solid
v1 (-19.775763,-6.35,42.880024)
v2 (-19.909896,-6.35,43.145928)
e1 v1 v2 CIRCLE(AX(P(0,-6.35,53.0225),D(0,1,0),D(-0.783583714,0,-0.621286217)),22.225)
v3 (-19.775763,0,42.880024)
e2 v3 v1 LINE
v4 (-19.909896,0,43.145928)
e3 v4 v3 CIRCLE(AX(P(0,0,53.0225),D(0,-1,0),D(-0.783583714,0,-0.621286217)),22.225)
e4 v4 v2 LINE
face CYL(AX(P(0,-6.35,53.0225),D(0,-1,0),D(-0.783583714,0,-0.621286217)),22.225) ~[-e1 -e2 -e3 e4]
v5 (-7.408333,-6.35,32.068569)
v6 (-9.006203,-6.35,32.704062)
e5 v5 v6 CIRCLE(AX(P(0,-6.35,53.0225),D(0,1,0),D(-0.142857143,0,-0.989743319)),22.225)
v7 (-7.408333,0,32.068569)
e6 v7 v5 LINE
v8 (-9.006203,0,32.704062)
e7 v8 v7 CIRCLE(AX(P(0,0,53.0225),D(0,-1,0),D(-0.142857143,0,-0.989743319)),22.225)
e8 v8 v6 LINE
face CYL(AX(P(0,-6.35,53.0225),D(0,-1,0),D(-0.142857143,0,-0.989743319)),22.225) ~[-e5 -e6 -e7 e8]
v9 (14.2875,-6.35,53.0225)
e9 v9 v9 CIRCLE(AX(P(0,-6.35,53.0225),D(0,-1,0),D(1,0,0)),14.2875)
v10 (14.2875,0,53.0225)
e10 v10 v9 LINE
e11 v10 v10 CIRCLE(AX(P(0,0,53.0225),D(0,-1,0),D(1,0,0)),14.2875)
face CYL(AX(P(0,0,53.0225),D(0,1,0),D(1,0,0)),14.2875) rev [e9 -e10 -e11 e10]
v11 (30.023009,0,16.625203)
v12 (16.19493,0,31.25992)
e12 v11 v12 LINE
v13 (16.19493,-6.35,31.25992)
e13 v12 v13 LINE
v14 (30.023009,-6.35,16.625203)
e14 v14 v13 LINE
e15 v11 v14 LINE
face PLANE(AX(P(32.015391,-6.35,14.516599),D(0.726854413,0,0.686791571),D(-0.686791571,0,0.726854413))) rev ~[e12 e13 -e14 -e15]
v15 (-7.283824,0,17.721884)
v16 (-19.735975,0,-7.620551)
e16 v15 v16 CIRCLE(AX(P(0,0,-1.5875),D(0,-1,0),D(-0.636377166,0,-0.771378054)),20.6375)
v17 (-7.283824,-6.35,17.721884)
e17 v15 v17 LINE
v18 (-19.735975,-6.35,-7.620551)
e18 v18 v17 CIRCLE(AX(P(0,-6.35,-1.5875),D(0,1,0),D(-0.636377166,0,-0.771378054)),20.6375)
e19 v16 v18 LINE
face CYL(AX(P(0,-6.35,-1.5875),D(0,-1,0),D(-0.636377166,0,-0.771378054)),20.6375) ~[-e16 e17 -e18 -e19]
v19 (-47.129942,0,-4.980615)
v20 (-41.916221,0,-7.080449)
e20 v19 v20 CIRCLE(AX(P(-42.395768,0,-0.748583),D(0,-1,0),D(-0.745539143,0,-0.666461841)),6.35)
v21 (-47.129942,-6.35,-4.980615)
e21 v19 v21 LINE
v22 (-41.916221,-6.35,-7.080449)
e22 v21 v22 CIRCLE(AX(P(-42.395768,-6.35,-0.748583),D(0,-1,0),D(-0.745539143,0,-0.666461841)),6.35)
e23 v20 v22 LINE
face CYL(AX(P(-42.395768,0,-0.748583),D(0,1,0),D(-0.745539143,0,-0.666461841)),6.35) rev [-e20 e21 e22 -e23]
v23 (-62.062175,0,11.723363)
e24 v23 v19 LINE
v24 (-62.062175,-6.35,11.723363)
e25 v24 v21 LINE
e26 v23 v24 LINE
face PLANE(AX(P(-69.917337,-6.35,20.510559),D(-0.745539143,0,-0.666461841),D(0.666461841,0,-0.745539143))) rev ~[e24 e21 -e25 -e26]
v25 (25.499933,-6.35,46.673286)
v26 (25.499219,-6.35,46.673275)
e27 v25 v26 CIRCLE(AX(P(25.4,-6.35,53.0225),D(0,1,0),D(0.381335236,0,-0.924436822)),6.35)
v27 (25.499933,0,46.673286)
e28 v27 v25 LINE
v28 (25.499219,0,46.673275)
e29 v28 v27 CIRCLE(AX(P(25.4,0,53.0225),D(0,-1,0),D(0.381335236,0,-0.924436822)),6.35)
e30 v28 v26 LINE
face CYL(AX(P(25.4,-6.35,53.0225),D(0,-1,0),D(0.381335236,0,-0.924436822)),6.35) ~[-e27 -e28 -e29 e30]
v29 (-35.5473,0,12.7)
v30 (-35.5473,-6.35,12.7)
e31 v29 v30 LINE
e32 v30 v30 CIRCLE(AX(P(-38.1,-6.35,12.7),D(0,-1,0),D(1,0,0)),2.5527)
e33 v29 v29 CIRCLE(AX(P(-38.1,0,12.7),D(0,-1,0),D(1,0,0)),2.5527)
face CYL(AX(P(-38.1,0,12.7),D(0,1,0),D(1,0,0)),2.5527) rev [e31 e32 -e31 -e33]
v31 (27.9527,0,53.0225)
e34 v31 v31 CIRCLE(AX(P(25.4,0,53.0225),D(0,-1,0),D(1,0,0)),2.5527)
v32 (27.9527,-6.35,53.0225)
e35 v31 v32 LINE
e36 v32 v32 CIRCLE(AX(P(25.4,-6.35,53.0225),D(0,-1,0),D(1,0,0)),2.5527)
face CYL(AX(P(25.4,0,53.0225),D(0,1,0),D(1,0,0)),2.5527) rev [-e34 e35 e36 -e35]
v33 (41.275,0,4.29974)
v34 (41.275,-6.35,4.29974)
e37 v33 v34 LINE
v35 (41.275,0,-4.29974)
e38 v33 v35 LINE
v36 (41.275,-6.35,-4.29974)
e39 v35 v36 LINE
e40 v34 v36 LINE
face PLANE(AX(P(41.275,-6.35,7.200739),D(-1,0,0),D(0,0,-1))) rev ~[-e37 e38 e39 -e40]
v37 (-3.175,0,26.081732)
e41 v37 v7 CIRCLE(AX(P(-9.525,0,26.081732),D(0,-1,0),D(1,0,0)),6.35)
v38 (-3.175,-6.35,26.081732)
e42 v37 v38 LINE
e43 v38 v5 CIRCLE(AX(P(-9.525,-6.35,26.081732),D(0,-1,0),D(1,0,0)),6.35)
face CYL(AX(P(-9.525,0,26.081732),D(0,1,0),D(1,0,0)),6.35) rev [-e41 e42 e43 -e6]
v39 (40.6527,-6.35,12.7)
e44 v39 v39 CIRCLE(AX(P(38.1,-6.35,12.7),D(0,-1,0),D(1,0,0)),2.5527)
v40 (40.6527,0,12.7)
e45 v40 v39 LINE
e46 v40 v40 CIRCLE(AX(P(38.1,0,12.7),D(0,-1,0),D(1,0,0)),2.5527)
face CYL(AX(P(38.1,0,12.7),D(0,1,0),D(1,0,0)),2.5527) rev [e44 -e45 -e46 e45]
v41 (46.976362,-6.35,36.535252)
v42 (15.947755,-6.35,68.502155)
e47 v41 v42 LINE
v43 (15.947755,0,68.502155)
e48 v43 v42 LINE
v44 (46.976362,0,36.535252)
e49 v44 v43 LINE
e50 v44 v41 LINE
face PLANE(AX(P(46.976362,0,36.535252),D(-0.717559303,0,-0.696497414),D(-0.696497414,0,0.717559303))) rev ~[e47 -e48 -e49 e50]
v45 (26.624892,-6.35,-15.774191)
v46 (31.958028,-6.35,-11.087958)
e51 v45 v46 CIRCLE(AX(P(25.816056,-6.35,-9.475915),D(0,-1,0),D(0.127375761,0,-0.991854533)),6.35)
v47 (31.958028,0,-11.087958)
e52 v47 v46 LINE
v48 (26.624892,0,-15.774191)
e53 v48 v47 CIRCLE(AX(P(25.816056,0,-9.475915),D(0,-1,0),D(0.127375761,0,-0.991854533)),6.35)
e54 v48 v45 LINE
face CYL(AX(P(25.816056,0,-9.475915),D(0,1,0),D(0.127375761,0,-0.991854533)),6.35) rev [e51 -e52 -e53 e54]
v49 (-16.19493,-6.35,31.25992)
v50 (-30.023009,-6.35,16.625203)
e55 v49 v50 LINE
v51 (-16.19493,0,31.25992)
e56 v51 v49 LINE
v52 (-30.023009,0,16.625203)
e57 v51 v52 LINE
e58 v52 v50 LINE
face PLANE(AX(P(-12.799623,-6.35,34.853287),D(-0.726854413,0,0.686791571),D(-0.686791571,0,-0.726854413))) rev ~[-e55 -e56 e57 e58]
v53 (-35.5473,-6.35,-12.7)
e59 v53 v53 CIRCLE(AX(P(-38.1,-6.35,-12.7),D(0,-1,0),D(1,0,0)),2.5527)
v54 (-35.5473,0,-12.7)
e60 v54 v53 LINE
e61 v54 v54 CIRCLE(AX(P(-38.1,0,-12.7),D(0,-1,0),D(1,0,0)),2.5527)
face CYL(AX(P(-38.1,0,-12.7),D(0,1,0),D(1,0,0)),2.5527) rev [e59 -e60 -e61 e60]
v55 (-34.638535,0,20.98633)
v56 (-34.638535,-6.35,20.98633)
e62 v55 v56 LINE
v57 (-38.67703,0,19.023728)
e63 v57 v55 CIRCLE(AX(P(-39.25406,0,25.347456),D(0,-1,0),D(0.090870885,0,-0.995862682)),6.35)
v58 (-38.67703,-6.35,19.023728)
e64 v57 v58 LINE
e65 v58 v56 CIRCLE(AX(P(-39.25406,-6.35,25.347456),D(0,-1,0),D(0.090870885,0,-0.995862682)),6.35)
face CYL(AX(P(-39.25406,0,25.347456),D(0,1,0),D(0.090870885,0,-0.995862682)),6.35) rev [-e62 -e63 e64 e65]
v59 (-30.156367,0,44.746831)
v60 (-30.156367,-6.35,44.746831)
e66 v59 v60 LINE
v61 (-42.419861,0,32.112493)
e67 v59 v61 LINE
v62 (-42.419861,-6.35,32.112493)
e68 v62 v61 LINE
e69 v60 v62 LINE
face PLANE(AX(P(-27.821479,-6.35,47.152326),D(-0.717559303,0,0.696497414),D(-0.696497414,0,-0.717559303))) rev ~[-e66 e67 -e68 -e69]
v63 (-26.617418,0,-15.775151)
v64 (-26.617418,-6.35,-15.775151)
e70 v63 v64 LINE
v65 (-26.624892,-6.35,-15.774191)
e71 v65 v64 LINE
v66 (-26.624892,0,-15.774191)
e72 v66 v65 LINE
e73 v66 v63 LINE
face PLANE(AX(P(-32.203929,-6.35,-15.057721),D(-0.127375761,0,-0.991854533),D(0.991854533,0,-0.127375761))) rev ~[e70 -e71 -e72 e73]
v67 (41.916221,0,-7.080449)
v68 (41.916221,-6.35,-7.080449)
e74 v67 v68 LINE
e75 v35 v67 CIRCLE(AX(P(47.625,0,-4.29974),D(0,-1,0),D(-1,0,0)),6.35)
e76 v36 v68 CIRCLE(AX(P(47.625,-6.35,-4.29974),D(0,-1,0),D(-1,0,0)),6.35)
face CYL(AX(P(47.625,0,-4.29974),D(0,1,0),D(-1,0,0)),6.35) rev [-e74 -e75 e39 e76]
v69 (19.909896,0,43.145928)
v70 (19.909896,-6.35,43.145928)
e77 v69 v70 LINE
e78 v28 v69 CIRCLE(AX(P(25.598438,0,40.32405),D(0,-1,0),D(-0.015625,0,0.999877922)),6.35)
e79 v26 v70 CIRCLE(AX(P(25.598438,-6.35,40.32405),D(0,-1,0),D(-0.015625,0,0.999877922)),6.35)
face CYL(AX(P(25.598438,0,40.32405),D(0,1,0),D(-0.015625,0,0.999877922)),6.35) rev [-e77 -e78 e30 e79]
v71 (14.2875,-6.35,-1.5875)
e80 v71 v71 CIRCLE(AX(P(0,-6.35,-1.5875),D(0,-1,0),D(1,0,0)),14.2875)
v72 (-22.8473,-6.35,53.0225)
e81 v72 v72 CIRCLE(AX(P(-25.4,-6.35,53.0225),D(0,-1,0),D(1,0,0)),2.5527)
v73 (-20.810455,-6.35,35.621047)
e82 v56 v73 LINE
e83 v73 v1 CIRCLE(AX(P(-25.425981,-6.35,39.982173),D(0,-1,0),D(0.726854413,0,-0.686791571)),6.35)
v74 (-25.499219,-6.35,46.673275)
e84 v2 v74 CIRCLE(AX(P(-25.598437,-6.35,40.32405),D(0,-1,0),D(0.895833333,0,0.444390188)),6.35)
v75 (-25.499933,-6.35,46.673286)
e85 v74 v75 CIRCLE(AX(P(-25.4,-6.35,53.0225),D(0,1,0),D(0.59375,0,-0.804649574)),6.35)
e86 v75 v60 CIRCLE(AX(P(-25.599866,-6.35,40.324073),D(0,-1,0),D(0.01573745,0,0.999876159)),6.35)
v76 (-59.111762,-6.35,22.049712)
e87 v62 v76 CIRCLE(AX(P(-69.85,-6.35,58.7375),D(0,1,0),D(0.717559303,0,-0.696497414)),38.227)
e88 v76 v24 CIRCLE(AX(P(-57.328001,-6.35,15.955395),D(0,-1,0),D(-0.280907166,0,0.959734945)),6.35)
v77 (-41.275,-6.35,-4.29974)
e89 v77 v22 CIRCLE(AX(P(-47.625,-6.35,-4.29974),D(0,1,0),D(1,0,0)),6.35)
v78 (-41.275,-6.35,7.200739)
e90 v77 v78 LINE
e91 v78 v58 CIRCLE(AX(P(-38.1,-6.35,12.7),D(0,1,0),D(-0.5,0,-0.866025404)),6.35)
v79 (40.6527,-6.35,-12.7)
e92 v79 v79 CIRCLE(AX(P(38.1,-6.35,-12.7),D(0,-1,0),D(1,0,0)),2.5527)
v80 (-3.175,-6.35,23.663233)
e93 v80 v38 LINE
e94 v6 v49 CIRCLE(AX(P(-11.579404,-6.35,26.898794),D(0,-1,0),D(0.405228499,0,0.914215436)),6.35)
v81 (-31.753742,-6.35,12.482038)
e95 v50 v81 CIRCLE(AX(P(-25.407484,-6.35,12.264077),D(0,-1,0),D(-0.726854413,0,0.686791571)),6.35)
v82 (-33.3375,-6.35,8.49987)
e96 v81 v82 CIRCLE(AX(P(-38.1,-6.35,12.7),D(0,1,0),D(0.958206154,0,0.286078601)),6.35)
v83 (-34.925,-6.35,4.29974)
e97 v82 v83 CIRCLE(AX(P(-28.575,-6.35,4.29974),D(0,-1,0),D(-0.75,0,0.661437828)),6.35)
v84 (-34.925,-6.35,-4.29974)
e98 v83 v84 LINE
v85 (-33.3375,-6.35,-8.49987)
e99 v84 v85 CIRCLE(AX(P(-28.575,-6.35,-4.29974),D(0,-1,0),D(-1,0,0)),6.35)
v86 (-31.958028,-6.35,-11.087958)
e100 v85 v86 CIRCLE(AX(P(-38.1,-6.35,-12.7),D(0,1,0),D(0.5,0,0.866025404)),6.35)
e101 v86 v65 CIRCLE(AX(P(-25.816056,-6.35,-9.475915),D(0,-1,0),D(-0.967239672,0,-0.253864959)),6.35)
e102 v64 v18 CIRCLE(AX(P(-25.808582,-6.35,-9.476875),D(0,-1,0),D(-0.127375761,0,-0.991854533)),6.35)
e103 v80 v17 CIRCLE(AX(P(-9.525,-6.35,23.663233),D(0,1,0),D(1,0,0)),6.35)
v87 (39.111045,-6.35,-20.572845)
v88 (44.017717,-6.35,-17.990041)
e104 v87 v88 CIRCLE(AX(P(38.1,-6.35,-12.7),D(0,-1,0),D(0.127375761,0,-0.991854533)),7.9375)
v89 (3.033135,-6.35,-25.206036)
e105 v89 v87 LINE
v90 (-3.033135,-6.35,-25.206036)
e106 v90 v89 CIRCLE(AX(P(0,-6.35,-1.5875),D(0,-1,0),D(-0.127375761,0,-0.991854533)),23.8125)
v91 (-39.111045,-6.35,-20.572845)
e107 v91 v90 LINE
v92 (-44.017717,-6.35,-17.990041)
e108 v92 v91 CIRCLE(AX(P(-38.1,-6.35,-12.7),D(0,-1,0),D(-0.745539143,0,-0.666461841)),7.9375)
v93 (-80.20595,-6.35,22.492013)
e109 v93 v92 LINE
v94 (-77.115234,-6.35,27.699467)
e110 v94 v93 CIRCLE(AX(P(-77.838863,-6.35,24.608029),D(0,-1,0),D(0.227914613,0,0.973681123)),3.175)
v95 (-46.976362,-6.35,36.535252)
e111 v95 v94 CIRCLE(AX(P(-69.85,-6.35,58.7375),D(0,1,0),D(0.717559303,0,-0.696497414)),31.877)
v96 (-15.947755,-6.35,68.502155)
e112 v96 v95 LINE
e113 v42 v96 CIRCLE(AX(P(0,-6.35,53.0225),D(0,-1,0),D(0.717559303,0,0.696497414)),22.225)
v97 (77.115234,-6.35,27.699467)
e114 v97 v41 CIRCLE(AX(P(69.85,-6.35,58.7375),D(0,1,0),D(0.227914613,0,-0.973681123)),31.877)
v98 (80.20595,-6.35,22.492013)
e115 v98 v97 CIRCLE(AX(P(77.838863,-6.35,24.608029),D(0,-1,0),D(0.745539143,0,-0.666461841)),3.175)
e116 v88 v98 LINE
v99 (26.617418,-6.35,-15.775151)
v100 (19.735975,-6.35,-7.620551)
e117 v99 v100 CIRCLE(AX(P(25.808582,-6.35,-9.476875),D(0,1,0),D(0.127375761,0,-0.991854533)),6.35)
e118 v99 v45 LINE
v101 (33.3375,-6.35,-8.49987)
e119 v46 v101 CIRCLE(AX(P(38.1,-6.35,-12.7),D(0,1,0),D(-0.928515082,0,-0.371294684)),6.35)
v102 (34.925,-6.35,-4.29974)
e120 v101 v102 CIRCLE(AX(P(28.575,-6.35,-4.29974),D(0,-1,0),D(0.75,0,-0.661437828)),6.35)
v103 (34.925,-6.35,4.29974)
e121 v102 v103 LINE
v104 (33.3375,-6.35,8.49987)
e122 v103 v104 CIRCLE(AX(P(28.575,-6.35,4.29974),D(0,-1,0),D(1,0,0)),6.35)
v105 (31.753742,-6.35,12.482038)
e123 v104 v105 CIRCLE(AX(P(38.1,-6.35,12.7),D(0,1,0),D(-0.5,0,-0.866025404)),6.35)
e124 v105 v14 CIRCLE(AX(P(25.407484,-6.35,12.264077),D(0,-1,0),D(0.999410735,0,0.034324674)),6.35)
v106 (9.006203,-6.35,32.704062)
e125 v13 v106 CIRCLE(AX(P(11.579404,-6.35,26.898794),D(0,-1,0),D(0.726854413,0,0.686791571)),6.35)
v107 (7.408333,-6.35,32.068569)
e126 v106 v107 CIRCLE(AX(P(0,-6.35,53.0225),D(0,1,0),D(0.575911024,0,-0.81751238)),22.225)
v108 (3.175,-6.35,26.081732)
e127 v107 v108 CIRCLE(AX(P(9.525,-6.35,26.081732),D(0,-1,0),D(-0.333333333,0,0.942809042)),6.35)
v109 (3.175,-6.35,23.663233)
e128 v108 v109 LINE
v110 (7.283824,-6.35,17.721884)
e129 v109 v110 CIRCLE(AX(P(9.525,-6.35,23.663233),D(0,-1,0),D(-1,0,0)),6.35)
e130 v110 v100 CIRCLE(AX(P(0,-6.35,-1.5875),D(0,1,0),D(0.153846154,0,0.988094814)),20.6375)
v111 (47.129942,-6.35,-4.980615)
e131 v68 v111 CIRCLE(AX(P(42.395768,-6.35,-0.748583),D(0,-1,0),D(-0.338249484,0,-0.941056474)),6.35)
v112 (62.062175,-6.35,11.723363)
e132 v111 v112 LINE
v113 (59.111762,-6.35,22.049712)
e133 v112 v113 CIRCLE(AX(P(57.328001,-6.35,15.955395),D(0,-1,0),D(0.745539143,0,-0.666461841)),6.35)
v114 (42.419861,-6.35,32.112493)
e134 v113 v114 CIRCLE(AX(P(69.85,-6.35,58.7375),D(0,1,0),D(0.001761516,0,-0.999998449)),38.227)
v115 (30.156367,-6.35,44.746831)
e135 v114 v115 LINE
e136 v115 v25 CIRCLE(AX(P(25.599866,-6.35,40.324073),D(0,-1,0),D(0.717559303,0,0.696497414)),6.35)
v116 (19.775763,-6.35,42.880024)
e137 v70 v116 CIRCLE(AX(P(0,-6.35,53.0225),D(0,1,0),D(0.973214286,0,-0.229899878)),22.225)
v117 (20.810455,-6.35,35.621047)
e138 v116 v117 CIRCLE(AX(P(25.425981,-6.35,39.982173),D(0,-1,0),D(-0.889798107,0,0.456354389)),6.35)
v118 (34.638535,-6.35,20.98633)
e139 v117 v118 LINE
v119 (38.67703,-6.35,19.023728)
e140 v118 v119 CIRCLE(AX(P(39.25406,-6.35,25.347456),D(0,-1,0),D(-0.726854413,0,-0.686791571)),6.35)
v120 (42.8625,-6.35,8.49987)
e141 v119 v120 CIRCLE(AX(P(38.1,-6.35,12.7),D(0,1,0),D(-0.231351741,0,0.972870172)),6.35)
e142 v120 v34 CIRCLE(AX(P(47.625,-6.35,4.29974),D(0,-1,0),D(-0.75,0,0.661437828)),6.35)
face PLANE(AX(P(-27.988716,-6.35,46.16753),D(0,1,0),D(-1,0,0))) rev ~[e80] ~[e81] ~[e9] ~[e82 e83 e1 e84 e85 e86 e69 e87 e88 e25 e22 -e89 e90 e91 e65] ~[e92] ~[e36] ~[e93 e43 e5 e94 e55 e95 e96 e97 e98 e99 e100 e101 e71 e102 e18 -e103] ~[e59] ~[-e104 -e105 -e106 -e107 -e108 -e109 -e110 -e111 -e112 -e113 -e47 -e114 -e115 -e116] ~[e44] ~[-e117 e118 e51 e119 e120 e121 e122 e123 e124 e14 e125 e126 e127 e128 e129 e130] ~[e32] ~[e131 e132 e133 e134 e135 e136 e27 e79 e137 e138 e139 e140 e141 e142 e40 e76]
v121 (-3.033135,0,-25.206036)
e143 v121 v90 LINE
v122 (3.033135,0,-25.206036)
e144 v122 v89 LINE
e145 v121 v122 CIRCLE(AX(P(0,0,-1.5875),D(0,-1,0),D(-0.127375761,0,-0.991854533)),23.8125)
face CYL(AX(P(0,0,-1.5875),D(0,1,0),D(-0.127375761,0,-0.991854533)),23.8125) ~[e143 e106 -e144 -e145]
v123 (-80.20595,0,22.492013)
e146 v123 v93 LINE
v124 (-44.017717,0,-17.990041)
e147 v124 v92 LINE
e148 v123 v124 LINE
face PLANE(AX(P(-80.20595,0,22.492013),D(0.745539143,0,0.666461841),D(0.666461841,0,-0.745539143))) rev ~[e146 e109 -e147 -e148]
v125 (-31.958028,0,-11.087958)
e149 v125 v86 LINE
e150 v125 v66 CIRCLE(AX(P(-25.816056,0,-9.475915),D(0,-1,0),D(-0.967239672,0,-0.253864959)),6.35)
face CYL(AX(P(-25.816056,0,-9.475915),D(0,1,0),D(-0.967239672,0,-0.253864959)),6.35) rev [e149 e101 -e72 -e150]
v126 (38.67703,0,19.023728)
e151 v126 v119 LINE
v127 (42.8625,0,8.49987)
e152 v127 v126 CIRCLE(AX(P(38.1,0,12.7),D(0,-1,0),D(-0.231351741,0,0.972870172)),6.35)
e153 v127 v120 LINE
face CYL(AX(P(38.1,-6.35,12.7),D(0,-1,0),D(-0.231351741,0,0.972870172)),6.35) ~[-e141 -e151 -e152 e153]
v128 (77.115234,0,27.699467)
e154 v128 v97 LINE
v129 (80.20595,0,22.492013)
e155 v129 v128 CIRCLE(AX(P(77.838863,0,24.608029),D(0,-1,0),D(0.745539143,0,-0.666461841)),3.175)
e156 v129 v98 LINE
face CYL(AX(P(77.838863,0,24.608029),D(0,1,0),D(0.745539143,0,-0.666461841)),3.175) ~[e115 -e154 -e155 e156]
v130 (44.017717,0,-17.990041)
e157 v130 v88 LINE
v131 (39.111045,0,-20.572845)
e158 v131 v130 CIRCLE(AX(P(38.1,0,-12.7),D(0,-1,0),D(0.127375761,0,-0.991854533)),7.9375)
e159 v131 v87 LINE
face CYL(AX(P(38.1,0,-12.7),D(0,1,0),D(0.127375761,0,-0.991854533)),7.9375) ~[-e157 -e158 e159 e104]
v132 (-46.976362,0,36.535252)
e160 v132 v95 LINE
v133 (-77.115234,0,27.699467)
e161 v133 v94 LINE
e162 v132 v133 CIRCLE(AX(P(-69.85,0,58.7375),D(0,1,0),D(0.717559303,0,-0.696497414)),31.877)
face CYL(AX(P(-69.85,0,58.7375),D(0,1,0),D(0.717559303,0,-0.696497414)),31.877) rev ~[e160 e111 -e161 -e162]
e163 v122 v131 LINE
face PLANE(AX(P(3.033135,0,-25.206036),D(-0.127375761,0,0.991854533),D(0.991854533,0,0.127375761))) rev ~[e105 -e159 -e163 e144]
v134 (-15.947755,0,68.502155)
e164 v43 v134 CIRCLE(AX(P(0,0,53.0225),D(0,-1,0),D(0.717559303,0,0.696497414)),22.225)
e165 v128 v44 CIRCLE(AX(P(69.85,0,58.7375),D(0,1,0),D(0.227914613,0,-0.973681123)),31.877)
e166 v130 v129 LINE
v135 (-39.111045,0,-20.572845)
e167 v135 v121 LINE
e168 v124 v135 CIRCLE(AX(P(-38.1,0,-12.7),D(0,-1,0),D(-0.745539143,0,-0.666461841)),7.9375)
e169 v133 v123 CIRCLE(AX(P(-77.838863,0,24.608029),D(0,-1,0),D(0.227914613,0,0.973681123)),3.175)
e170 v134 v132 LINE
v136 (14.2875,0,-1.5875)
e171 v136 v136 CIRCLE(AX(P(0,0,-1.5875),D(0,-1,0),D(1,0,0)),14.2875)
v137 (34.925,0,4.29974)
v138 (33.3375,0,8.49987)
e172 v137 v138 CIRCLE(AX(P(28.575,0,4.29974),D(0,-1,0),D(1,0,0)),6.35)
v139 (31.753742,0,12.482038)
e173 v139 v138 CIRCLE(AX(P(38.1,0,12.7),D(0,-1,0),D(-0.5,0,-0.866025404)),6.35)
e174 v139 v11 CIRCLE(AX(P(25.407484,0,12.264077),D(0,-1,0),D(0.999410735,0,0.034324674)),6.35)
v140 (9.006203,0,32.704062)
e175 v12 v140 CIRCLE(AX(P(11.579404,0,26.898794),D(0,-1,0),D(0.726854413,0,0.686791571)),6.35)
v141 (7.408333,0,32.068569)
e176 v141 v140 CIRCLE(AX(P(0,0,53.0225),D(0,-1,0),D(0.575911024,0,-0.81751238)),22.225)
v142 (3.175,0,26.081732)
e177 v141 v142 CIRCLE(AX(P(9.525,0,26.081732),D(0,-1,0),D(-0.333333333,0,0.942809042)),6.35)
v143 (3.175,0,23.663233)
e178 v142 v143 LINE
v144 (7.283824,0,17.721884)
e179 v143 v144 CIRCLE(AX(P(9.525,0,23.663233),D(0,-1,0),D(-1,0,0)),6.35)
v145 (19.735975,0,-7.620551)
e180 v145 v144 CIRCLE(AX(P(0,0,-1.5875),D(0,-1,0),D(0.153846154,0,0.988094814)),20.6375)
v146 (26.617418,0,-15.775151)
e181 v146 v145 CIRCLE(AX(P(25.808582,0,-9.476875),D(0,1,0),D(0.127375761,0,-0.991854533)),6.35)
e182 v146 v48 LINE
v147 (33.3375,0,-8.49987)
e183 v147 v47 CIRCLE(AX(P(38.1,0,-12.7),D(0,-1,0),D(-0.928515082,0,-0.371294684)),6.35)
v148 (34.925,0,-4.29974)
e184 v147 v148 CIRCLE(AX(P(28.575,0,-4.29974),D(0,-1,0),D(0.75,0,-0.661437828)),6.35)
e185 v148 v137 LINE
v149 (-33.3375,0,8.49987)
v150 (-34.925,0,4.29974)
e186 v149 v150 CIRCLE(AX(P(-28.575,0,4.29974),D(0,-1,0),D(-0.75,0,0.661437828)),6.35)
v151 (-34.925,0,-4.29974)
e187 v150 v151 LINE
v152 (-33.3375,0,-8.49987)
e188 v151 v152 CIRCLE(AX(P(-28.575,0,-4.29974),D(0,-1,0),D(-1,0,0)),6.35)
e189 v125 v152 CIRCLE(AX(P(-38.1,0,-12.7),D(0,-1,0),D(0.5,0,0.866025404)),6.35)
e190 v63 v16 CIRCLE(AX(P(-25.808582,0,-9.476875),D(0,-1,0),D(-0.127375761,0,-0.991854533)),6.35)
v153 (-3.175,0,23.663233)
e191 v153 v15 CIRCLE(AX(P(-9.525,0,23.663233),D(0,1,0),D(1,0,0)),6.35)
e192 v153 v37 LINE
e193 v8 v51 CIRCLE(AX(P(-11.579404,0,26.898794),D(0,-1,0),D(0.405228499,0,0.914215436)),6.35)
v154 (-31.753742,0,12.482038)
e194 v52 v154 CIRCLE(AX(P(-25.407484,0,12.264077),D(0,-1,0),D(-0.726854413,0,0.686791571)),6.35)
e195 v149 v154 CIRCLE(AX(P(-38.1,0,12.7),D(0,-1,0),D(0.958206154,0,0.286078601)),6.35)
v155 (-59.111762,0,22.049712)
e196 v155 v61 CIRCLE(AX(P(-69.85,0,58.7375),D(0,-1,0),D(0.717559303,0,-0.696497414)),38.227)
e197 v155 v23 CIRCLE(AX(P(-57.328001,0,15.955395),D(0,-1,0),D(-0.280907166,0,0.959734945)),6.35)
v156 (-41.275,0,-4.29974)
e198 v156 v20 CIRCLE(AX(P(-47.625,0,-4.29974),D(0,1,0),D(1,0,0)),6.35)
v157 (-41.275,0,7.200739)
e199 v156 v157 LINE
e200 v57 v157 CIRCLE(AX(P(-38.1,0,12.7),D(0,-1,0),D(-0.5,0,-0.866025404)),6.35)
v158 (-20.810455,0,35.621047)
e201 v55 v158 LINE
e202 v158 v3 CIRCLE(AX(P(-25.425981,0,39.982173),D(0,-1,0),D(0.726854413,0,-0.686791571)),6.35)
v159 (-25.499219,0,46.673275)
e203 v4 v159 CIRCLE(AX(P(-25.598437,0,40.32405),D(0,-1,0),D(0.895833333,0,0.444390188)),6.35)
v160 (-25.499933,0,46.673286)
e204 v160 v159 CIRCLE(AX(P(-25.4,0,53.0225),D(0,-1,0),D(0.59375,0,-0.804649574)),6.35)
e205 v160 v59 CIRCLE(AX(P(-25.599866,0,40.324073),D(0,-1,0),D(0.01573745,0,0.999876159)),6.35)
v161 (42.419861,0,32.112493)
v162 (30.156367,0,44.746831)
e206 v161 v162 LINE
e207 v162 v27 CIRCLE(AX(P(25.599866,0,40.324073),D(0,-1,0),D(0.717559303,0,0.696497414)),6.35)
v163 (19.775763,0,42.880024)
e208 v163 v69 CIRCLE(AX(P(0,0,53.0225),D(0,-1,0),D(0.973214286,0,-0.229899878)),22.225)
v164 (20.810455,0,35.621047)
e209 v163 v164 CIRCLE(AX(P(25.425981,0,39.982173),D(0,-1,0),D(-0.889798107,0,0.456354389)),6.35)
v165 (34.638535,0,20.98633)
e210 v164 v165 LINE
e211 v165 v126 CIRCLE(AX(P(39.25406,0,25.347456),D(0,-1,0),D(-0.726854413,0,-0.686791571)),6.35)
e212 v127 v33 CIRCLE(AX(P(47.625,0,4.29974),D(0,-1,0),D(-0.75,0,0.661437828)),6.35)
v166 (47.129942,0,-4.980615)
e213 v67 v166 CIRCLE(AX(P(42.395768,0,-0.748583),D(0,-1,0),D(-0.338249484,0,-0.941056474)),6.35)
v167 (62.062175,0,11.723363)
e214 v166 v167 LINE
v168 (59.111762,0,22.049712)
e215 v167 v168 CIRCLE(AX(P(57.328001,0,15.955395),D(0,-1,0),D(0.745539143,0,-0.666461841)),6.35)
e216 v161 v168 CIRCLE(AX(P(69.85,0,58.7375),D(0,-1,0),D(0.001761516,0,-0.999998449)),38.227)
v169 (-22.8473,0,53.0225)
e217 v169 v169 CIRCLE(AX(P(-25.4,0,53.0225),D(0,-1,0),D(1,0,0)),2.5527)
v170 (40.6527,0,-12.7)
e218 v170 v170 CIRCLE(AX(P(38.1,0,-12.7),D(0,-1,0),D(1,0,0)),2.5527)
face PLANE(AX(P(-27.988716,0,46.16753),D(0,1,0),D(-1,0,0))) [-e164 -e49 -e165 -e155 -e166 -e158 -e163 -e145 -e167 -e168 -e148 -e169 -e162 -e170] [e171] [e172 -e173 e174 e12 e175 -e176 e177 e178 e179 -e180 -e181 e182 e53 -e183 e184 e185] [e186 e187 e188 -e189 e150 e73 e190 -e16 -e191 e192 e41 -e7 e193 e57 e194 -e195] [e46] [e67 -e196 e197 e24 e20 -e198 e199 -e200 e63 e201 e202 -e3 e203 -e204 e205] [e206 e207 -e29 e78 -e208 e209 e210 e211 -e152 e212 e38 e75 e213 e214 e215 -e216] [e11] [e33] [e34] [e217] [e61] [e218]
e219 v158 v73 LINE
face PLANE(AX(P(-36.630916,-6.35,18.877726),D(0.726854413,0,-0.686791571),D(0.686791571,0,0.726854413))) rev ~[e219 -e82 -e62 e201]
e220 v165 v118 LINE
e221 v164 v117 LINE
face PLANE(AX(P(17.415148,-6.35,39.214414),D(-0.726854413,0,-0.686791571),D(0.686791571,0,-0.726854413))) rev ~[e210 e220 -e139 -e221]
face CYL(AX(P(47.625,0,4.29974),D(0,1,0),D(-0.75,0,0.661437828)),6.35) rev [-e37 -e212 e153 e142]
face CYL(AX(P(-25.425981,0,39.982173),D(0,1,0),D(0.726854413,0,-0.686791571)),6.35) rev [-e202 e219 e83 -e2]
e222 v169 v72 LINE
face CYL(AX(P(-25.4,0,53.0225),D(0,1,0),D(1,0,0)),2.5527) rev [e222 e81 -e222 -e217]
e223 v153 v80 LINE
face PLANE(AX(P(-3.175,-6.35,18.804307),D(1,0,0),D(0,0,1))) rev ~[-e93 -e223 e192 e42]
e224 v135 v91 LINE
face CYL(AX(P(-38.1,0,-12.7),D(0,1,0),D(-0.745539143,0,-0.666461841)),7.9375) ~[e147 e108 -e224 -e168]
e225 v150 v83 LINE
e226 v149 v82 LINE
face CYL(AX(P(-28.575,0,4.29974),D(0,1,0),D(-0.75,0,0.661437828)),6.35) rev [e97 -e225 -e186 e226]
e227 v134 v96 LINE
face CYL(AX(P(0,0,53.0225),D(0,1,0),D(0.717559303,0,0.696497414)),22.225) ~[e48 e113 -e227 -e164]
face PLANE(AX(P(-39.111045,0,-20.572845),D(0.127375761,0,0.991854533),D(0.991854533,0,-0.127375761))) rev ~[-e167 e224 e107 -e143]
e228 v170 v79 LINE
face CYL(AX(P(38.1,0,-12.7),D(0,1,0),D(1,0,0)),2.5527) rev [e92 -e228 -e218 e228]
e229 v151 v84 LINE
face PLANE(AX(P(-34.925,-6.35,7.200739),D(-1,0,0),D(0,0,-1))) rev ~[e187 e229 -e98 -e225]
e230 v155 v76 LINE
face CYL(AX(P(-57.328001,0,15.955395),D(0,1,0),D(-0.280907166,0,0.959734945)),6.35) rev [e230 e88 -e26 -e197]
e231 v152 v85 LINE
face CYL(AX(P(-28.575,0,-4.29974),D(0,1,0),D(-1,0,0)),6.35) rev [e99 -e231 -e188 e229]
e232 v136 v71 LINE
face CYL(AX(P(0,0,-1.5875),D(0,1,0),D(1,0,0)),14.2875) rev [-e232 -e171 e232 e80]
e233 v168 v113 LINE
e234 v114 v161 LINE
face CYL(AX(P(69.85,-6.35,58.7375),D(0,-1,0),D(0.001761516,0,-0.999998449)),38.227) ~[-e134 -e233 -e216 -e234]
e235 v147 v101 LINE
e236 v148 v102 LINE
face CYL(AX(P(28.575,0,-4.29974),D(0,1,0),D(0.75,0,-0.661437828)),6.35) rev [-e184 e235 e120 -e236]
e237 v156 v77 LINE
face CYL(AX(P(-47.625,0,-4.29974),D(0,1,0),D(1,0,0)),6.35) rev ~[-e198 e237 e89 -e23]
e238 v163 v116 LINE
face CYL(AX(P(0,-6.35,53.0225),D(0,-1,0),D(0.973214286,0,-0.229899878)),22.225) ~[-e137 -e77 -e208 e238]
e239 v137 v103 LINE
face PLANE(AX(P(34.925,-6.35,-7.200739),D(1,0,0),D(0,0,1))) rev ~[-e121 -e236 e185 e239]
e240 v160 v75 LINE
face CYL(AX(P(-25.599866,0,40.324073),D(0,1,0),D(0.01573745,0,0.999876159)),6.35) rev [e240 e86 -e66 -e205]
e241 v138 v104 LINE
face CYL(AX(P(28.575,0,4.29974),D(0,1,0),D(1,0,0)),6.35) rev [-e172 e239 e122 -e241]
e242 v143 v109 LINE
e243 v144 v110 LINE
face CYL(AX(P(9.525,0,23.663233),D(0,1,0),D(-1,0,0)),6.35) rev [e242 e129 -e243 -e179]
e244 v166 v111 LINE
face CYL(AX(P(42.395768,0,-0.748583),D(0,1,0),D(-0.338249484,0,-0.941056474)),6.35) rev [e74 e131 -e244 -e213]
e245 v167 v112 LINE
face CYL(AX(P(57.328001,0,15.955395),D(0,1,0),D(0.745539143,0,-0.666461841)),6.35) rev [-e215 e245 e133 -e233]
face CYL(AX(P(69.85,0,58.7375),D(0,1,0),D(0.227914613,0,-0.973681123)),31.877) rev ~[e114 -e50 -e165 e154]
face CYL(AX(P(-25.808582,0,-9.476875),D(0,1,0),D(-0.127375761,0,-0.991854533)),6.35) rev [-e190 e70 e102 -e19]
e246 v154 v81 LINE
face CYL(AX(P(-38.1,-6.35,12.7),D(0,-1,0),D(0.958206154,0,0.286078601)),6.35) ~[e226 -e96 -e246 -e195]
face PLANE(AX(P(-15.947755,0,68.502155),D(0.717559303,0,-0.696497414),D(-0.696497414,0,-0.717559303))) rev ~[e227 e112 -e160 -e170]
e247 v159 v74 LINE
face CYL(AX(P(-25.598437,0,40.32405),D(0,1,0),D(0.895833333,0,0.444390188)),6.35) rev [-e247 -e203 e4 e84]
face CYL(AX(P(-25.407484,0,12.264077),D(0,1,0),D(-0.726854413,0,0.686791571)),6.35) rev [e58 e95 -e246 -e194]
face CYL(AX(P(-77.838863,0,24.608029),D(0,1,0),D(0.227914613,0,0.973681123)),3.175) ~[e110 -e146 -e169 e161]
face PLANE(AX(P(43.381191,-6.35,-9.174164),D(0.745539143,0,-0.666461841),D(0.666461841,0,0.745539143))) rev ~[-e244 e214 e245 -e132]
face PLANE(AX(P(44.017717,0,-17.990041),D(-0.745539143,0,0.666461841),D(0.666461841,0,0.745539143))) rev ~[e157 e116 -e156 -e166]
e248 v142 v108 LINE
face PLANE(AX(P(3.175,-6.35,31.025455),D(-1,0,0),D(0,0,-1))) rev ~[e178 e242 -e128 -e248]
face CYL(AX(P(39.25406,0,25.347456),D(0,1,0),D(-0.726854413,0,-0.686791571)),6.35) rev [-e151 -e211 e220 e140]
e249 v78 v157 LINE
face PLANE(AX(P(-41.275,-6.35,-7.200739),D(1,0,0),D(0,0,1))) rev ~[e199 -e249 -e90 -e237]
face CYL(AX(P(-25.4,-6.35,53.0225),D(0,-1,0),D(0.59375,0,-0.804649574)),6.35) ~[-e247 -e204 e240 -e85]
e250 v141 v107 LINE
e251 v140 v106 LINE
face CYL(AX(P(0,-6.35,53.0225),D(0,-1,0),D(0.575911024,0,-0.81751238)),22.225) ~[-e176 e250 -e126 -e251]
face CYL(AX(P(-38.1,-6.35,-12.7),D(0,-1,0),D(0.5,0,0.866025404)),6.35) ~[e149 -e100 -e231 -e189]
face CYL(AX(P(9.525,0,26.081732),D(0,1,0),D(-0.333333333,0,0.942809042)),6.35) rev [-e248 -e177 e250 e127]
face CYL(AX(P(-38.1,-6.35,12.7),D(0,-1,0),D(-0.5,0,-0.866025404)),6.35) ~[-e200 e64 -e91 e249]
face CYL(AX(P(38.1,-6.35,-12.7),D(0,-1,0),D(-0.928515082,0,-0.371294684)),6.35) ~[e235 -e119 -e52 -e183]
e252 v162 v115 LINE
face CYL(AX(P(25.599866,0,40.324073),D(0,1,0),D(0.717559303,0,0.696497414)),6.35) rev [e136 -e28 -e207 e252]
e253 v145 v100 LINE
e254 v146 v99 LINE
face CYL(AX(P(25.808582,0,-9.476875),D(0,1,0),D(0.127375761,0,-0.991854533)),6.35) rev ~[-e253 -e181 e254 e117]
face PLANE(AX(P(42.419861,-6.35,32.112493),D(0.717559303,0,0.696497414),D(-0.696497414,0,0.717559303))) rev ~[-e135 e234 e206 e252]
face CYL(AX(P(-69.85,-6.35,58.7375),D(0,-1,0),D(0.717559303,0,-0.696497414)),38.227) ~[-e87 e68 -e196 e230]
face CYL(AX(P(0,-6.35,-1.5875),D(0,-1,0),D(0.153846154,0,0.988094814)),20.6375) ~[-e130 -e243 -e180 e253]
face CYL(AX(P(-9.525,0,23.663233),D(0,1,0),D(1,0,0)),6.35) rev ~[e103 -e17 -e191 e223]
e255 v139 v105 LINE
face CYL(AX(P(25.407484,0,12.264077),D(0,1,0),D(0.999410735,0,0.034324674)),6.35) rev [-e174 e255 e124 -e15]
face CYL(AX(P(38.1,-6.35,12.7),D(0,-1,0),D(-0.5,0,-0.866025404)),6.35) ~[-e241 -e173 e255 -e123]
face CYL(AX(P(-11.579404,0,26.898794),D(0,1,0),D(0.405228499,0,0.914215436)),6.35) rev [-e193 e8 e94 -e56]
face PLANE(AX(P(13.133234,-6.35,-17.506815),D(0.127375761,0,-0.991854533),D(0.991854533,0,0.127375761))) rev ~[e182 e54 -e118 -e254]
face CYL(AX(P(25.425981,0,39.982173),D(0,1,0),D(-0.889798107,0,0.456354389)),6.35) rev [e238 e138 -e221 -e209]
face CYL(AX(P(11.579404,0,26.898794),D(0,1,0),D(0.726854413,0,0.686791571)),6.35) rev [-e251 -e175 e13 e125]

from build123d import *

# Parameters (mm, degrees)
F0_R        = 2.5527
F0_R_2      = 14.2875
F1_DEPTH    = 6.35
F3_DEPTH    = 25.4
F4_T1_DEPTH = 6.35


# Not quite as in the source:
# - a fillet or chamfer that OpenCascade refuses, or shapes differently, is made with other operations: its cross-section is extruded or revolved along the edge and cut away or added


with BuildPart() as f1:
    # F0 (on Front) → F1 (new body)
    with BuildSketch(Plane.XZ):
        with BuildLine():
            ThreePointArc((-3.0331353108, -25.2060360773), (0, -25.4), (3.0331353108, -25.2060360773))
            Line((3.0331353108, -25.2060360773), (39.1110451036, -20.5728453591))
            ThreePointArc((39.1110451036, -20.5728453591), (41.7972497423, -19.7238344651), (44.0177169487, -17.9900408661))
            Line((44.0177169487, -17.9900408661), (80.2059498117, 22.4920129361))
            ThreePointArc((80.2059498117, 22.4920129361), (80.5691803237, 26.2285207166), (77.1152341344, 27.6994668475))
            ThreePointArc((77.1152341344, 27.6994668475), (60.8820938076, 28.1479627769), (46.9763621139, 36.5352519414))
            Line((46.9763621139, 36.5352519414), (15.9477554983, 68.5021550209))
            ThreePointArc((15.9477554983, 68.5021550209), (0, 75.2475), (-15.9477554983, 68.5021550209))
            Line((-15.9477554983, 68.5021550209), (-46.9763621139, 36.5352519414))
            ThreePointArc((-46.9763621139, 36.5352519414), (-60.8820938076, 28.1479627769), (-77.1152341344, 27.6994668475))
            ThreePointArc((-77.1152341344, 27.6994668475), (-80.5691803237, 26.2285207166), (-80.2059498117, 22.4920129361))
            Line((-80.2059498117, 22.4920129361), (-44.0177169487, -17.9900408661))
            ThreePointArc((-44.0177169487, -17.9900408661), (-41.7972497423, -19.7238344651), (-39.1110451036, -20.5728453591))
            Line((-39.1110451036, -20.5728453591), (-3.0331353108, -25.2060360773))
        make_face()
        with Locations((-38.1, -12.7)):
            Circle(F0_R, mode=Mode.SUBTRACT)
        with Locations((0, -1.5875)):
            Circle(F0_R_2, mode=Mode.SUBTRACT)
        with Locations((-38.1, 12.7)):
            Circle(F0_R, mode=Mode.SUBTRACT)
        with Locations((38.1, -12.7)):
            Circle(F0_R, mode=Mode.SUBTRACT)
        with Locations((38.1, 12.7)):
            Circle(F0_R, mode=Mode.SUBTRACT)
        with Locations((-25.4, 53.0225)):
            Circle(F0_R, mode=Mode.SUBTRACT)
        with Locations((0, 53.0225)):
            Circle(F0_R_2, mode=Mode.SUBTRACT)
        with Locations((25.4, 53.0225)):
            Circle(F0_R, mode=Mode.SUBTRACT)
    extrude(amount=F1_DEPTH)

    # F2 (on face) → F3 (cut)
    with BuildSketch(Plane.XZ.offset(6.35)):
        with BuildLine():
            ThreePointArc((-43.3811914248, -9.1741643352), (-42.441704222, -8.0661997833), (-41.275, -7.200738686))
            Line((-41.275, -7.200738686), (-41.275, 7.200738686))
            ThreePointArc((-41.275, 7.200738686), (-44.0004697722, 15.046690535), (-36.6309164423, 18.8777255929))
            Line((-36.6309164423, 18.8777255929), (-17.4151480361, 39.2144138227))
            ThreePointArc((-17.4151480361, 39.2144138227), (-20.0010259245, 43.331804103), (-21.6296875, 47.9129752029))
            ThreePointArc((-21.6296875, 47.9129752029), (-24.6257359251, 46.7198802953), (-27.8214787465, 47.1523261797))
            Line((-27.8214787465, 47.1523261797), (-42.4198605429, 32.112493364))
            ThreePointArc((-42.4198605429, 32.112493364), (-54.9895844041, 23.5171709652), (-69.9173374643, 20.510559308))
            Line((-69.9173374643, 20.510559308), (-43.3811914248, -9.1741643352))
        make_face()
        with BuildLine():
            Line((-34.925, 7.200738686), (-34.925, -7.200738686))
            ThreePointArc((-34.925, -7.200738686), (-32.0996562634, -10.6219299715), (-32.2039292281, -15.0577212415))
            Line((-32.2039292281, -15.0577212415), (-13.1332337576, -17.5068145995))
            ThreePointArc((-13.1332337576, -17.5068145995), (-19.9026130173, 3.870741597), (-3.175, 18.8043067186))
            Line((-3.175, 18.8043067186), (-3.175, 31.0254547439))
            ThreePointArc((-3.175, 31.0254547439), (-8.2134168725, 32.3708557972), (-12.799622514, 34.8532873451))
            Line((-12.799622514, 34.8532873451), (-32.0153909201, 14.5165991152))
            ThreePointArc((-32.0153909201, 14.5165991152), (-32.1995302278, 10.353309465), (-34.925, 7.200738686))
        make_face()
        with BuildLine():
            Line((41.275, 7.200738686), (41.275, -7.200738686))
            ThreePointArc((41.275, -7.200738686), (42.441704222, -8.0661997833), (43.3811914248, -9.1741643352))
            Line((43.3811914248, -9.1741643352), (69.9173374643, 20.510559308))
            ThreePointArc((69.9173374643, 20.510559308), (54.9895844041, 23.5171709652), (42.4198605429, 32.112493364))
            Line((42.4198605429, 32.112493364), (27.8214787465, 47.1523261797))
            ThreePointArc((27.8214787465, 47.1523261797), (24.6257359251, 46.7198802953), (21.6296875, 47.9129752029))
            ThreePointArc((21.6296875, 47.9129752029), (20.0010259245, 43.331804103), (17.4151480361, 39.2144138227))
            Line((17.4151480361, 39.2144138227), (36.6309164423, 18.8777255929))
            ThreePointArc((36.6309164423, 18.8777255929), (44.0004697722, 15.046690535), (41.275, 7.200738686))
        make_face()
        with BuildLine():
            Line((13.1332337576, -17.5068145995), (32.2039292281, -15.0577212415))
            ThreePointArc((32.2039292281, -15.0577212415), (32.0996562634, -10.6219299715), (34.925, -7.200738686))
            Line((34.925, -7.200738686), (34.925, 7.200738686))
            ThreePointArc((34.925, 7.200738686), (32.1995302278, 10.353309465), (32.0153909201, 14.5165991152))
            Line((32.0153909201, 14.5165991152), (12.799622514, 34.8532873451))
            ThreePointArc((12.799622514, 34.8532873451), (8.2134168725, 32.3708557972), (3.175, 31.0254547439))
            Line((3.175, 31.0254547439), (3.175, 18.8043067186))
            ThreePointArc((3.175, 18.8043067186), (19.9026130173, 3.870741597), (13.1332337576, -17.5068145995))
        make_face()
    extrude(amount=-F3_DEPTH, mode=Mode.SUBTRACT)

    # F4: fillet of radius 6.35 on 31 edges, made by hand

    # F4_s2 → F4_t1 (join)
    with BuildSketch(Plane.XZ):
        with BuildLine():
            ThreePointArc((-25.4999328069, 46.6732863925), (-28.0274278752, 46.1917334318), (-30.1563671847, 44.7468313623))
            Line((-30.1563671847, 44.7468313623), (-27.8214787465, 47.1523261797))
            ThreePointArc((-27.8214787465, 47.1523261797), (-26.6832571196, 46.8035168705), (-25.4999328069, 46.6732863925))
        make_face()
        with BuildLine():
            ThreePointArc((-19.9098958333, 43.1459280792), (-22.2094720123, 45.6940981456), (-25.49921875, 46.6732751938))
            ThreePointArc((-25.49921875, 46.6732751938), (-23.4626186853, 46.9752647936), (-21.6296875, 47.9129752029))
            ThreePointArc((-21.6296875, 47.9129752029), (-20.9061098832, 45.4802725735), (-19.9098958333, 43.1459280792))
        make_face()
        with BuildLine():
            ThreePointArc((-20.8104553969, 35.621046866), (-19.1395225651, 39.0861033883), (-19.775762937, 42.8800237117))
            ThreePointArc((-19.775762937, 42.8800237117), (-18.6855596309, 40.9891926291), (-17.4151480361, 39.2144138227))
            Line((-17.4151480361, 39.2144138227), (-20.8104553969, 35.621046866))
        make_face()
        with BuildLine():
            ThreePointArc((-3.175, 23.6632332814), (-4.3022626627, 20.0513757668), (-7.2838235294, 17.721884274))
            ThreePointArc((-7.2838235294, 17.721884274), (-5.2573431495, 18.3691216895), (-3.175, 18.8043067186))
            Line((-3.175, 18.8043067186), (-3.175, 23.6632332814))
        make_face()
        with BuildLine():
            ThreePointArc((-38.6770301176, 19.0237280336), (-36.4785224973, 19.6361610946), (-34.6385347131, 20.9863295896))
            Line((-34.6385347131, 20.9863295896), (-36.6309164423, 18.8777255929))
            ThreePointArc((-36.6309164423, 18.8777255929), (-37.6480387039, 19.0338954038), (-38.6770301176, 19.0237280336))
        make_face()
        with BuildLine():
            ThreePointArc((-41.275, -4.2997395874), (-41.6851188985, -6.5448036176), (-42.8625, -8.4998697937))
            ThreePointArc((-42.8625, -8.4998697937), (-42.1215559142, -7.7857769659), (-41.275, -7.200738686))
            Line((-41.275, -7.200738686), (-41.275, -4.2997395874))
        make_face()
        with BuildLine():
            ThreePointArc((-47.1299420033, -4.9806154768), (-43.9553595951, -6.9040823934), (-40.2478842222, -6.724291392))
            ThreePointArc((-40.2478842222, -6.724291392), (-42.0112990938, -7.6975766474), (-43.3811914248, -9.1741643352))
            Line((-43.3811914248, -9.1741643352), (-47.1299420033, -4.9806154768))
        make_face()
        with BuildLine():
            ThreePointArc((-59.1117617466, 22.0497122742), (-63.433674019, 17.6998895462), (-62.0621747984, 11.7233626833))
            Line((-62.0621747984, 11.7233626833), (-69.9173374643, 20.510559308))
            ThreePointArc((-69.9173374643, 20.510559308), (-64.4593340972, 20.8924970257), (-59.1117617466, 22.0497122742))
        make_face()
        with BuildLine():
            ThreePointArc((-34.925, -4.2997395874), (-34.5148811015, -6.5448036176), (-33.3375, -8.4998697937))
            ThreePointArc((-33.3375, -8.4998697937), (-34.0784440858, -7.7857769659), (-34.925, -7.200738686))
            Line((-34.925, -7.200738686), (-34.925, -4.2997395874))
        make_face()
        with BuildLine():
            ThreePointArc((-33.3375, 8.4998697937), (-34.5148811015, 6.5448036176), (-34.925, 4.2997395874))
            Line((-34.925, 4.2997395874), (-34.925, 7.200738686))
            ThreePointArc((-34.925, 7.200738686), (-34.0784440858, 7.7857769659), (-33.3375, 8.4998697937))
        make_face()
        with BuildLine():
            ThreePointArc((-30.0230091909, 16.625203112), (-31.2668035127, 14.7117022115), (-31.7537418344, 12.4820383172))
            ThreePointArc((-31.7537418344, 12.4820383172), (-31.8018673776, 13.5099539932), (-32.0153909201, 14.5165991152))
            Line((-32.0153909201, 14.5165991152), (-30.0230091909, 16.625203112))
        make_face()
        with BuildLine():
            ThreePointArc((-31.9580280848, -11.087957509), (-30.0075511004, -14.2460167198), (-26.6248922524, -15.7741913054))
            Line((-26.6248922524, -15.7741913054), (-32.2039292281, -15.0577212415))
            ThreePointArc((-32.2039292281, -15.0577212415), (-31.762147528, -13.092588898), (-31.9580280848, -11.087957509))
        make_face()
        with BuildLine():
            ThreePointArc((3.175, 23.6632332814), (4.3022626627, 20.0513757668), (7.2838235294, 17.721884274))
            ThreePointArc((7.2838235294, 17.721884274), (5.2573431495, 18.3691216895), (3.175, 18.8043067186))
            Line((3.175, 18.8043067186), (3.175, 23.6632332814))
        make_face()
        with BuildLine():
            ThreePointArc((-26.6174183984, -15.7751511113), (-20.9556247606, -13.572152955), (-19.7359747119, -7.620551336))
            ThreePointArc((-19.7359747119, -7.620551336), (-17.161898691, -13.0494212861), (-13.1332337576, -17.5068145995))
            Line((-13.1332337576, -17.5068145995), (-26.6174183984, -15.7751511113))
        make_face()
        with BuildLine():
            ThreePointArc((26.6248922524, -15.7741913054), (30.0075511004, -14.2460167198), (31.9580280848, -11.087957509))
            ThreePointArc((31.9580280848, -11.087957509), (31.762147528, -13.092588898), (32.2039292281, -15.0577212415))
            Line((32.2039292281, -15.0577212415), (26.6248922524, -15.7741913054))
        make_face()
        with BuildLine():
            ThreePointArc((33.3375, -8.4998697937), (34.5148811015, -6.5448036176), (34.925, -4.2997395874))
            Line((34.925, -4.2997395874), (34.925, -7.200738686))
            ThreePointArc((34.925, -7.200738686), (34.0784440858, -7.7857769659), (33.3375, -8.4998697937))
        make_face()
        with BuildLine():
            ThreePointArc((26.6174183984, -15.7751511113), (20.9556247606, -13.572152955), (19.7359747119, -7.620551336))
            ThreePointArc((19.7359747119, -7.620551336), (17.161898691, -13.0494212861), (13.1332337576, -17.5068145995))
            Line((13.1332337576, -17.5068145995), (26.6174183984, -15.7751511113))
        make_face()
        with BuildLine():
            ThreePointArc((34.6385347131, 20.9863295896), (36.4785224973, 19.6361610946), (38.6770301176, 19.0237280336))
            ThreePointArc((38.6770301176, 19.0237280336), (37.6480387039, 19.0338954038), (36.6309164423, 18.8777255929))
            Line((36.6309164423, 18.8777255929), (34.6385347131, 20.9863295896))
        make_face()
        with BuildLine():
            ThreePointArc((42.8625, 8.4998697937), (41.6851188985, 6.5448036176), (41.275, 4.2997395874))
            Line((41.275, 4.2997395874), (41.275, 7.200738686))
            ThreePointArc((41.275, 7.200738686), (42.1215559142, 7.7857769659), (42.8625, 8.4998697937))
        make_face()
        with BuildLine():
            ThreePointArc((19.775762937, 42.8800237117), (19.1395225651, 39.0861033883), (20.8104553969, 35.621046866))
            Line((20.8104553969, 35.621046866), (17.4151480361, 39.2144138227))
            ThreePointArc((17.4151480361, 39.2144138227), (18.6855596309, 40.9891926291), (19.775762937, 42.8800237117))
        make_face()
        with BuildLine():
            ThreePointArc((-9.0062033853, 32.7040619305), (-12.8300676147, 33.1244136714), (-16.1949298747, 31.2599203883))
            Line((-16.1949298747, 31.2599203883), (-12.799622514, 34.8532873451))
            ThreePointArc((-12.799622514, 34.8532873451), (-10.955742935, 33.685428822), (-9.0062033853, 32.7040619305))
        make_face()
        with BuildLine():
            ThreePointArc((7.4083333333, 32.0685690508), (4.3402467111, 29.7479058461), (3.175, 26.0817316368))
            Line((3.175, 26.0817316368), (3.175, 31.0254547439))
            ThreePointArc((3.175, 31.0254547439), (5.317307399, 31.442952576), (7.4083333333, 32.0685690508))
        make_face()
        with BuildLine():
            ThreePointArc((-3.175, 26.0817316368), (-4.3402467111, 29.7479058461), (-7.4083333333, 32.0685690508))
            ThreePointArc((-7.4083333333, 32.0685690508), (-5.317307399, 31.442952576), (-3.175, 31.0254547439))
            Line((-3.175, 31.0254547439), (-3.175, 26.0817316368))
        make_face()
        with BuildLine():
            ThreePointArc((16.1949298747, 31.2599203883), (12.8300676147, 33.1244136714), (9.0062033853, 32.7040619305))
            ThreePointArc((9.0062033853, 32.7040619305), (10.955742935, 33.685428822), (12.799622514, 34.8532873451))
            Line((12.799622514, 34.8532873451), (16.1949298747, 31.2599203883))
        make_face()
        with BuildLine():
            ThreePointArc((31.7537418344, 12.4820383172), (31.2668035127, 14.7117022115), (30.0230091909, 16.625203112))
            Line((30.0230091909, 16.625203112), (32.0153909201, 14.5165991152))
            ThreePointArc((32.0153909201, 14.5165991152), (31.8018673776, 13.5099539932), (31.7537418344, 12.4820383172))
        make_face()
        with BuildLine():
            ThreePointArc((34.925, 4.2997395874), (34.5148811015, 6.5448036176), (33.3375, 8.4998697937))
            ThreePointArc((33.3375, 8.4998697937), (34.0784440858, 7.7857769659), (34.925, 7.200738686))
            Line((34.925, 7.200738686), (34.925, 4.2997395874))
        make_face()
        with BuildLine():
            ThreePointArc((62.0621747984, 11.7233626833), (63.433674019, 17.6998895462), (59.1117617466, 22.0497122742))
            ThreePointArc((59.1117617466, 22.0497122742), (64.4593340972, 20.8924970257), (69.9173374643, 20.510559308))
            Line((69.9173374643, 20.510559308), (62.0621747984, 11.7233626833))
        make_face()
        with BuildLine():
            ThreePointArc((25.49921875, 46.6732751938), (22.2094720123, 45.6940981456), (19.9098958333, 43.1459280792))
            ThreePointArc((19.9098958333, 43.1459280792), (20.9061098832, 45.4802725735), (21.6296875, 47.9129752029))
            ThreePointArc((21.6296875, 47.9129752029), (23.4626186853, 46.9752647936), (25.49921875, 46.6732751938))
        make_face()
        with BuildLine():
            ThreePointArc((30.1563671847, 44.7468313623), (28.0274278752, 46.1917334318), (25.4999328069, 46.6732863925))
            ThreePointArc((25.4999328069, 46.6732863925), (26.6832571196, 46.8035168705), (27.8214787465, 47.1523261797))
            Line((27.8214787465, 47.1523261797), (30.1563671847, 44.7468313623))
        make_face()
        with BuildLine():
            ThreePointArc((41.275, -4.2997395874), (41.6851188985, -6.5448036176), (42.8625, -8.4998697937))
            ThreePointArc((42.8625, -8.4998697937), (42.1215559142, -7.7857769659), (41.275, -7.200738686))
            Line((41.275, -7.200738686), (41.275, -4.2997395874))
        make_face()
        with BuildLine():
            ThreePointArc((40.2478842222, -6.724291392), (43.9553595951, -6.9040823934), (47.1299420033, -4.9806154768))
            Line((47.1299420033, -4.9806154768), (43.3811914248, -9.1741643352))
            ThreePointArc((43.3811914248, -9.1741643352), (42.0112990938, -7.6975766474), (40.2478842222, -6.724291392))
        make_face()
    extrude(amount=F4_T1_DEPTH)


solid = f1.part
